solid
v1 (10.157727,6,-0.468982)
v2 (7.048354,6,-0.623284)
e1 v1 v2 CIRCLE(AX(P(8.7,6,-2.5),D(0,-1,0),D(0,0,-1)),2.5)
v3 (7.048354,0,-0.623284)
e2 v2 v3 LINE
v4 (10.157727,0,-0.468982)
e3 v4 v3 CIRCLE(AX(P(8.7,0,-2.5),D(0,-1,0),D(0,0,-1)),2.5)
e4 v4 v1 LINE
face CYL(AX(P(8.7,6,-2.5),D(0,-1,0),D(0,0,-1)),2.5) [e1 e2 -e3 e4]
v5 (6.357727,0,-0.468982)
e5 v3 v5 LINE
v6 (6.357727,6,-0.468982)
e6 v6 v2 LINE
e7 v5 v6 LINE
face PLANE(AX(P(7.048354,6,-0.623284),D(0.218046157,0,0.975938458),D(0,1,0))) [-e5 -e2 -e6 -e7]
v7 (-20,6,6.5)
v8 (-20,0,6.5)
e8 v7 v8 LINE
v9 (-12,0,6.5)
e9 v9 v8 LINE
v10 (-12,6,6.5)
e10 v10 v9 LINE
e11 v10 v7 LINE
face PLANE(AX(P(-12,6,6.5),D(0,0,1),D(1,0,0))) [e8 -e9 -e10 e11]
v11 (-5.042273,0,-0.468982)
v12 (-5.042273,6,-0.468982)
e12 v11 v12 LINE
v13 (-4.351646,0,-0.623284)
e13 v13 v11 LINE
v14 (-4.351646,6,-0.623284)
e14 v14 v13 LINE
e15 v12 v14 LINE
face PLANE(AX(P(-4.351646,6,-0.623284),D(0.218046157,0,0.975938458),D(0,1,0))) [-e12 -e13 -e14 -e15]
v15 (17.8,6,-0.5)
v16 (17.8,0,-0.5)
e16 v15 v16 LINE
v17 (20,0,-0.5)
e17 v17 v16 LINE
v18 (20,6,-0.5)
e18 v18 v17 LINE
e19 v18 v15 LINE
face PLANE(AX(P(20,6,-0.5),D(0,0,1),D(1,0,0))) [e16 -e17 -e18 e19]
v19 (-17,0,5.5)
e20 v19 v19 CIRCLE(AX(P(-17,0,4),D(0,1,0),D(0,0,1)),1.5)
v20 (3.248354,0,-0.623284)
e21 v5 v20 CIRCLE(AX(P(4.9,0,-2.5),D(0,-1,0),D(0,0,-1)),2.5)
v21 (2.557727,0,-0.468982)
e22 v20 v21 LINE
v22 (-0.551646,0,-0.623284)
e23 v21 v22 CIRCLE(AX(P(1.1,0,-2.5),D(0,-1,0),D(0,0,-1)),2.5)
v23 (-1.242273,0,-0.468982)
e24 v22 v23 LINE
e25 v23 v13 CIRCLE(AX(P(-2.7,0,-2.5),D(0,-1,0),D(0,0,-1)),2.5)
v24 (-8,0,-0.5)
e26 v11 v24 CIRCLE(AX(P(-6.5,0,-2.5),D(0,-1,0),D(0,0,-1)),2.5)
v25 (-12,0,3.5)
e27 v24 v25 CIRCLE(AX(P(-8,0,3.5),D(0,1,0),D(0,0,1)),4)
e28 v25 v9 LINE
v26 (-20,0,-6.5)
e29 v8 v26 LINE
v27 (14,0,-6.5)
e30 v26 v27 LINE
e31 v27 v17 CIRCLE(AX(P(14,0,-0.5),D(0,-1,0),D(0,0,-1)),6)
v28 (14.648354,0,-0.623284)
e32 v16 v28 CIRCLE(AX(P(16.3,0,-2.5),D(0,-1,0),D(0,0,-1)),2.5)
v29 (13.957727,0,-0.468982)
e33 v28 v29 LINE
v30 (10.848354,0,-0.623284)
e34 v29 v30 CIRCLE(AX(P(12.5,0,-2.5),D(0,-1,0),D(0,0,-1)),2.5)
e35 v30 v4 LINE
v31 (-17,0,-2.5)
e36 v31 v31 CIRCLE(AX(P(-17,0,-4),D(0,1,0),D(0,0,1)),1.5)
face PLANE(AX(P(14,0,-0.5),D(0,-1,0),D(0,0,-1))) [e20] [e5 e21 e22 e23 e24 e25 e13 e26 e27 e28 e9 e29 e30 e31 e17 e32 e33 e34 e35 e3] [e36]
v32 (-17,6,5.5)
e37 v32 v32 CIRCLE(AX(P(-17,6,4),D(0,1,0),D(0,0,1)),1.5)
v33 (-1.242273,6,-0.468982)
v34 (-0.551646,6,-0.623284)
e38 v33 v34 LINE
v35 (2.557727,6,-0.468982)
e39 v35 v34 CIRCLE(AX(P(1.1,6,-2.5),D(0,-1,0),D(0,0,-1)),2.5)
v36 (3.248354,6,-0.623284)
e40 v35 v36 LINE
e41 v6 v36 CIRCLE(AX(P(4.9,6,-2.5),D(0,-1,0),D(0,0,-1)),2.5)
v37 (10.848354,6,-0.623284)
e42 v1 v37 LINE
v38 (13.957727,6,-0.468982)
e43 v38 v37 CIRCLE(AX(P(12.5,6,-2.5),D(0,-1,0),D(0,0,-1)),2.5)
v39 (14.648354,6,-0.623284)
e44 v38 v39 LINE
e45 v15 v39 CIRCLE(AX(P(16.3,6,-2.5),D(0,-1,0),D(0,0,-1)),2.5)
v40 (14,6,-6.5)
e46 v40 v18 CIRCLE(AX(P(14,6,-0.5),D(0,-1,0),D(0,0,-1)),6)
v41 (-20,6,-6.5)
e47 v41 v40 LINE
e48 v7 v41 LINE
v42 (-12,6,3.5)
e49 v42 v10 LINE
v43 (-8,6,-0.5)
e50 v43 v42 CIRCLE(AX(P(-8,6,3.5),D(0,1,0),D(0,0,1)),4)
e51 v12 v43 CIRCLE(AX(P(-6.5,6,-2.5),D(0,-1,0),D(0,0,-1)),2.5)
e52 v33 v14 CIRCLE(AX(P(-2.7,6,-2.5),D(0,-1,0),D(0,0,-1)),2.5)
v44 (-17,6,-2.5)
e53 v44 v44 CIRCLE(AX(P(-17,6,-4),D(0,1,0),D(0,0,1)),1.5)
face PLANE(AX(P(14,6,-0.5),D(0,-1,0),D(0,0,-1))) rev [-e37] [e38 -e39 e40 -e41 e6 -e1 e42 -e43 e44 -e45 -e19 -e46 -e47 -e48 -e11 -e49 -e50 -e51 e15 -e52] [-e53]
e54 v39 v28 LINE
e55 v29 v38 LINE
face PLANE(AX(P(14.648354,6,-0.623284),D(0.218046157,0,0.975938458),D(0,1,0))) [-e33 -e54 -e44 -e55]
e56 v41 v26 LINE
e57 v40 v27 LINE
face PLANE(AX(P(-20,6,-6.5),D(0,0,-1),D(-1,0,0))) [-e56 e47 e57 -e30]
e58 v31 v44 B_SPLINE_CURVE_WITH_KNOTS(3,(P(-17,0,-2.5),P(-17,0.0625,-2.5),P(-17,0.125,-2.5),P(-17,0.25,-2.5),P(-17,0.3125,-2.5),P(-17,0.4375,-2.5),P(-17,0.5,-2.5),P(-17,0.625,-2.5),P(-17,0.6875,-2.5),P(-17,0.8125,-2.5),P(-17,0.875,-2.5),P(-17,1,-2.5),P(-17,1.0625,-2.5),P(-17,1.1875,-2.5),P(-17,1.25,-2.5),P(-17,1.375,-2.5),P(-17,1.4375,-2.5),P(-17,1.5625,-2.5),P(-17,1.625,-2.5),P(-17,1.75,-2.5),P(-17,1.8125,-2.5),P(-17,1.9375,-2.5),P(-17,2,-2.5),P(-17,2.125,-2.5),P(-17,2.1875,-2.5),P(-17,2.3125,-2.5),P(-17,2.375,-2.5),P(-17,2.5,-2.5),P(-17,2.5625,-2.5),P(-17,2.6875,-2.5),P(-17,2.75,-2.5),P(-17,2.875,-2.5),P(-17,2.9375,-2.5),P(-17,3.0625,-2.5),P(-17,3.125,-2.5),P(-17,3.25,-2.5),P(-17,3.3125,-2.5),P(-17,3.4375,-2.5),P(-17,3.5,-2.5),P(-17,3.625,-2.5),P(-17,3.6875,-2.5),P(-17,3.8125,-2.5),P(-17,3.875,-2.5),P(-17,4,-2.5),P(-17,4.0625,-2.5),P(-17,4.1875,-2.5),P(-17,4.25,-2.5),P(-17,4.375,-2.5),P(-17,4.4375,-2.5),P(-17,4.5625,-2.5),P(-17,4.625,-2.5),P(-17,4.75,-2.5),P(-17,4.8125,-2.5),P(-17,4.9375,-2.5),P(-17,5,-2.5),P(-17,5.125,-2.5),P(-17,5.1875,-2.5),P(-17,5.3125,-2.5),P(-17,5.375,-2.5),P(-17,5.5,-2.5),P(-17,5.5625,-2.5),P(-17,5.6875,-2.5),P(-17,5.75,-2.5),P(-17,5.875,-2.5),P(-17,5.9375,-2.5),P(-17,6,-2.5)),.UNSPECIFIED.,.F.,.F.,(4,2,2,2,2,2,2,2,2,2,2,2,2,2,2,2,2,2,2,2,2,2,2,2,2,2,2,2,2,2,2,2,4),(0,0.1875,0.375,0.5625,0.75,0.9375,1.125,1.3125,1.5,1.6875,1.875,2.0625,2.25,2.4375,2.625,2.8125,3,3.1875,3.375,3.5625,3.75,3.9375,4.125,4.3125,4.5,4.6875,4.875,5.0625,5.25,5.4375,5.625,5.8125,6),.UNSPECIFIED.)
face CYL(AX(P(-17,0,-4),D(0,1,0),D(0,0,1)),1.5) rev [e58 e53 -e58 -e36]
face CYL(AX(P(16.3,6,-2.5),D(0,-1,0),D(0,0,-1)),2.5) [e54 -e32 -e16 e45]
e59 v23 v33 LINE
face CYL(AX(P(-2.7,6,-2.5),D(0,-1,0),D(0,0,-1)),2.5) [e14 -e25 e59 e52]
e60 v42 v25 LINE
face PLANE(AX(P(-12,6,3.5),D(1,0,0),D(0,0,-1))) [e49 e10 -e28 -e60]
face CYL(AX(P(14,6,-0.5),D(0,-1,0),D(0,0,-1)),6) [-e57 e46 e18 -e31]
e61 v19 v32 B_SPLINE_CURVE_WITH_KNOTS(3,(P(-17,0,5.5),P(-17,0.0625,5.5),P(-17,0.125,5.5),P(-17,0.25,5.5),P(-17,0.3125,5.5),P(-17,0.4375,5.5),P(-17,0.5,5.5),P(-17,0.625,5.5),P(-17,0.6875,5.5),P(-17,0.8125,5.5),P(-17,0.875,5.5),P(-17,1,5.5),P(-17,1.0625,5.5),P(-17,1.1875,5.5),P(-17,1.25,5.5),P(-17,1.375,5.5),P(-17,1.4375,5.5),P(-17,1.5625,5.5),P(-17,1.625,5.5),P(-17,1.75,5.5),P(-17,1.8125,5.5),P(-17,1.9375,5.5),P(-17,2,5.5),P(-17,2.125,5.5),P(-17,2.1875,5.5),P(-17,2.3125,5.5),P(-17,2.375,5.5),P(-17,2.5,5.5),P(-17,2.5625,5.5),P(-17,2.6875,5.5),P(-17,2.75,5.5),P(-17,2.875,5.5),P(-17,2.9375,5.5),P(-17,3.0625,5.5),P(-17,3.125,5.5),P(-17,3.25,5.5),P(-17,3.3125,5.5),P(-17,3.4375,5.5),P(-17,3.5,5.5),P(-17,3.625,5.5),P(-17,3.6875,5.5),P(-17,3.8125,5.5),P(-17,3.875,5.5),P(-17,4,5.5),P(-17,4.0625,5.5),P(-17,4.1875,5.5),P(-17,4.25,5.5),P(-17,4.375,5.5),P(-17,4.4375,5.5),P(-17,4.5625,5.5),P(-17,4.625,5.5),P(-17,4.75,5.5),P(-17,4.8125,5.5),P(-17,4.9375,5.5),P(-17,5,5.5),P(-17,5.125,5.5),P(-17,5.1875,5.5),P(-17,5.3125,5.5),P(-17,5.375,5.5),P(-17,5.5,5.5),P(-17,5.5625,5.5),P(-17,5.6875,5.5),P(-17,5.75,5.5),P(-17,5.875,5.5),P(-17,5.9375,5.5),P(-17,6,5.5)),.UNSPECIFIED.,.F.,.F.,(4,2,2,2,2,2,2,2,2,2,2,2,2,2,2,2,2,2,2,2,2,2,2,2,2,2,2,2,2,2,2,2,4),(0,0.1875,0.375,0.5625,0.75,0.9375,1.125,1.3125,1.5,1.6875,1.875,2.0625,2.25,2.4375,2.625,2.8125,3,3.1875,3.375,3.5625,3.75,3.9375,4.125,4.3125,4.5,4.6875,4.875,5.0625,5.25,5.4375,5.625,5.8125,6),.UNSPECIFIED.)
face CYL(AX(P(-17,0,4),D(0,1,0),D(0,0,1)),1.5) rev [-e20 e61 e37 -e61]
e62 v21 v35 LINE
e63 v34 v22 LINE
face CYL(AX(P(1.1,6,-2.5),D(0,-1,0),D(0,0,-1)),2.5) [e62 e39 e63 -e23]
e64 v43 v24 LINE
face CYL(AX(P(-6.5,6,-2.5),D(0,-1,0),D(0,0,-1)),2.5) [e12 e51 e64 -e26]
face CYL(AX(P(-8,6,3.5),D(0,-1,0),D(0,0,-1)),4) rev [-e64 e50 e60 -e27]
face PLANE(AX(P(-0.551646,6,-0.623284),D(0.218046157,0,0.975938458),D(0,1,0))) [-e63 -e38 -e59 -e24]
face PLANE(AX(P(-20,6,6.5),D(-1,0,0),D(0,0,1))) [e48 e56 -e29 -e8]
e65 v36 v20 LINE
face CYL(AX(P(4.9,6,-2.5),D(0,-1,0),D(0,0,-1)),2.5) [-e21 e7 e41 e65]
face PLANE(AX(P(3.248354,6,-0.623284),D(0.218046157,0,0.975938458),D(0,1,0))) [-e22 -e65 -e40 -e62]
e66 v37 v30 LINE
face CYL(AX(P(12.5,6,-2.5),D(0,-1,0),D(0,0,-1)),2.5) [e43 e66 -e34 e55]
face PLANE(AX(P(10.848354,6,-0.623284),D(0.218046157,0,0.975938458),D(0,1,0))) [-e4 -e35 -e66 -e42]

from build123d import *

# Parameters (mm, degrees)
BOSS_EXTRUDE1_DEPTH = 6
SKETCH2_R           = 1.5
CUT_EXTRUDE1_DEPTH  = 22.868927729


with BuildPart() as part:
    # Sketch1 → Boss-Extrude1 (new body)
    with BuildSketch(Plane.XZ):
        with BuildLine():
            Line((20, -0.5), (17.8, -0.5))
            ThreePointArc((17.8, -0.5), (16.025787821, -0.015083969), (14.4, -0.875192319))
            ThreePointArc((14.4, -0.875192319), (12.5, 0), (10.6, -0.875192319))
            ThreePointArc((10.6, -0.875192319), (8.7, 0), (6.8, -0.875192319))
            ThreePointArc((6.8, -0.875192319), (4.9, 0), (3, -0.875192319))
            ThreePointArc((3, -0.875192319), (1.1, 0), (-0.8, -0.875192319))
            ThreePointArc((-0.8, -0.875192319), (-2.7, 0), (-4.6, -0.875192319))
            ThreePointArc((-4.6, -0.875192319), (-6.225787821, -0.015083969), (-8, -0.5))
            ThreePointArc((-8, -0.5), (-10.828427125, 0.671572875), (-12, 3.5))
            Line((-12, 3.5), (-12, 6.5))
            Line((-12, 6.5), (-20, 6.5))
            Line((-20, 6.5), (-20, -6.5))
            Line((-20, -6.5), (14, -6.5))
            ThreePointArc((14, -6.5), (18.242640687, -4.742640687), (20, -0.5))
        make_face()
    extrude(amount=-BOSS_EXTRUDE1_DEPTH)

    # Chamfer1
    # the kernel refuses this chamfer: 0.5, 0.339586842 mm, written as the material it adds along each edge
    with BuildSketch(Plane(origin=(-4.6, 0, -0.875192319), x_dir=(0.7020641169662168, 0, 0.7121137378736954), z_dir=(0, 1, 0)), Plane(origin=(-0.8, 0, -0.875192319), x_dir=(0.7020641169662151, 0, 0.7121137378736971), z_dir=(0, 1, 0)), Plane(origin=(3, 0, -0.875192319), x_dir=(0.7020641169662145, 0, 0.7121137378736978), z_dir=(0, 1, 0)), Plane(origin=(6.8, 0, -0.875192319), x_dir=(0.7020641169662162, 0, 0.712113737873696), z_dir=(0, 1, 0)), Plane(origin=(10.6, 0, -0.875192319), x_dir=(0.7020641169662151, 0, 0.7121137378736971), z_dir=(0, 1, 0)), Plane(origin=(14.4, 0, -0.875192319), x_dir=(0.702064116966188, 0, 0.7121137378737239), z_dir=(0, 1, 0))) as chamfer1_piece_1:
        with BuildLine():
            Line((0.353747902, 0), (-0.021236492, -0.600134418))
            ThreePointArc((-0.021236492, -0.600134418), (0.007142061, -0.309444564), (0, 0))
            ThreePointArc((0, 0), (0.182204356, -0.006259046), (0.353747902, 0))
        make_face()
    extrude(amount=6)

    # Sketch2 → Cut-Extrude1 (cut, through all)
    with BuildSketch(Plane(origin=(0, 6, 0), x_dir=(1, 0, 0), z_dir=(0, 1, 0))):
        with Locations(Location((-17, 4, 0), (0, 0, 270))):
            Circle(SKETCH2_R)
        with Locations(Location((-17, -4, 0), (0, 0, 270))):
            Circle(SKETCH2_R)
    extrude(amount=-CUT_EXTRUDE1_DEPTH, mode=Mode.SUBTRACT)


solid = part.part
